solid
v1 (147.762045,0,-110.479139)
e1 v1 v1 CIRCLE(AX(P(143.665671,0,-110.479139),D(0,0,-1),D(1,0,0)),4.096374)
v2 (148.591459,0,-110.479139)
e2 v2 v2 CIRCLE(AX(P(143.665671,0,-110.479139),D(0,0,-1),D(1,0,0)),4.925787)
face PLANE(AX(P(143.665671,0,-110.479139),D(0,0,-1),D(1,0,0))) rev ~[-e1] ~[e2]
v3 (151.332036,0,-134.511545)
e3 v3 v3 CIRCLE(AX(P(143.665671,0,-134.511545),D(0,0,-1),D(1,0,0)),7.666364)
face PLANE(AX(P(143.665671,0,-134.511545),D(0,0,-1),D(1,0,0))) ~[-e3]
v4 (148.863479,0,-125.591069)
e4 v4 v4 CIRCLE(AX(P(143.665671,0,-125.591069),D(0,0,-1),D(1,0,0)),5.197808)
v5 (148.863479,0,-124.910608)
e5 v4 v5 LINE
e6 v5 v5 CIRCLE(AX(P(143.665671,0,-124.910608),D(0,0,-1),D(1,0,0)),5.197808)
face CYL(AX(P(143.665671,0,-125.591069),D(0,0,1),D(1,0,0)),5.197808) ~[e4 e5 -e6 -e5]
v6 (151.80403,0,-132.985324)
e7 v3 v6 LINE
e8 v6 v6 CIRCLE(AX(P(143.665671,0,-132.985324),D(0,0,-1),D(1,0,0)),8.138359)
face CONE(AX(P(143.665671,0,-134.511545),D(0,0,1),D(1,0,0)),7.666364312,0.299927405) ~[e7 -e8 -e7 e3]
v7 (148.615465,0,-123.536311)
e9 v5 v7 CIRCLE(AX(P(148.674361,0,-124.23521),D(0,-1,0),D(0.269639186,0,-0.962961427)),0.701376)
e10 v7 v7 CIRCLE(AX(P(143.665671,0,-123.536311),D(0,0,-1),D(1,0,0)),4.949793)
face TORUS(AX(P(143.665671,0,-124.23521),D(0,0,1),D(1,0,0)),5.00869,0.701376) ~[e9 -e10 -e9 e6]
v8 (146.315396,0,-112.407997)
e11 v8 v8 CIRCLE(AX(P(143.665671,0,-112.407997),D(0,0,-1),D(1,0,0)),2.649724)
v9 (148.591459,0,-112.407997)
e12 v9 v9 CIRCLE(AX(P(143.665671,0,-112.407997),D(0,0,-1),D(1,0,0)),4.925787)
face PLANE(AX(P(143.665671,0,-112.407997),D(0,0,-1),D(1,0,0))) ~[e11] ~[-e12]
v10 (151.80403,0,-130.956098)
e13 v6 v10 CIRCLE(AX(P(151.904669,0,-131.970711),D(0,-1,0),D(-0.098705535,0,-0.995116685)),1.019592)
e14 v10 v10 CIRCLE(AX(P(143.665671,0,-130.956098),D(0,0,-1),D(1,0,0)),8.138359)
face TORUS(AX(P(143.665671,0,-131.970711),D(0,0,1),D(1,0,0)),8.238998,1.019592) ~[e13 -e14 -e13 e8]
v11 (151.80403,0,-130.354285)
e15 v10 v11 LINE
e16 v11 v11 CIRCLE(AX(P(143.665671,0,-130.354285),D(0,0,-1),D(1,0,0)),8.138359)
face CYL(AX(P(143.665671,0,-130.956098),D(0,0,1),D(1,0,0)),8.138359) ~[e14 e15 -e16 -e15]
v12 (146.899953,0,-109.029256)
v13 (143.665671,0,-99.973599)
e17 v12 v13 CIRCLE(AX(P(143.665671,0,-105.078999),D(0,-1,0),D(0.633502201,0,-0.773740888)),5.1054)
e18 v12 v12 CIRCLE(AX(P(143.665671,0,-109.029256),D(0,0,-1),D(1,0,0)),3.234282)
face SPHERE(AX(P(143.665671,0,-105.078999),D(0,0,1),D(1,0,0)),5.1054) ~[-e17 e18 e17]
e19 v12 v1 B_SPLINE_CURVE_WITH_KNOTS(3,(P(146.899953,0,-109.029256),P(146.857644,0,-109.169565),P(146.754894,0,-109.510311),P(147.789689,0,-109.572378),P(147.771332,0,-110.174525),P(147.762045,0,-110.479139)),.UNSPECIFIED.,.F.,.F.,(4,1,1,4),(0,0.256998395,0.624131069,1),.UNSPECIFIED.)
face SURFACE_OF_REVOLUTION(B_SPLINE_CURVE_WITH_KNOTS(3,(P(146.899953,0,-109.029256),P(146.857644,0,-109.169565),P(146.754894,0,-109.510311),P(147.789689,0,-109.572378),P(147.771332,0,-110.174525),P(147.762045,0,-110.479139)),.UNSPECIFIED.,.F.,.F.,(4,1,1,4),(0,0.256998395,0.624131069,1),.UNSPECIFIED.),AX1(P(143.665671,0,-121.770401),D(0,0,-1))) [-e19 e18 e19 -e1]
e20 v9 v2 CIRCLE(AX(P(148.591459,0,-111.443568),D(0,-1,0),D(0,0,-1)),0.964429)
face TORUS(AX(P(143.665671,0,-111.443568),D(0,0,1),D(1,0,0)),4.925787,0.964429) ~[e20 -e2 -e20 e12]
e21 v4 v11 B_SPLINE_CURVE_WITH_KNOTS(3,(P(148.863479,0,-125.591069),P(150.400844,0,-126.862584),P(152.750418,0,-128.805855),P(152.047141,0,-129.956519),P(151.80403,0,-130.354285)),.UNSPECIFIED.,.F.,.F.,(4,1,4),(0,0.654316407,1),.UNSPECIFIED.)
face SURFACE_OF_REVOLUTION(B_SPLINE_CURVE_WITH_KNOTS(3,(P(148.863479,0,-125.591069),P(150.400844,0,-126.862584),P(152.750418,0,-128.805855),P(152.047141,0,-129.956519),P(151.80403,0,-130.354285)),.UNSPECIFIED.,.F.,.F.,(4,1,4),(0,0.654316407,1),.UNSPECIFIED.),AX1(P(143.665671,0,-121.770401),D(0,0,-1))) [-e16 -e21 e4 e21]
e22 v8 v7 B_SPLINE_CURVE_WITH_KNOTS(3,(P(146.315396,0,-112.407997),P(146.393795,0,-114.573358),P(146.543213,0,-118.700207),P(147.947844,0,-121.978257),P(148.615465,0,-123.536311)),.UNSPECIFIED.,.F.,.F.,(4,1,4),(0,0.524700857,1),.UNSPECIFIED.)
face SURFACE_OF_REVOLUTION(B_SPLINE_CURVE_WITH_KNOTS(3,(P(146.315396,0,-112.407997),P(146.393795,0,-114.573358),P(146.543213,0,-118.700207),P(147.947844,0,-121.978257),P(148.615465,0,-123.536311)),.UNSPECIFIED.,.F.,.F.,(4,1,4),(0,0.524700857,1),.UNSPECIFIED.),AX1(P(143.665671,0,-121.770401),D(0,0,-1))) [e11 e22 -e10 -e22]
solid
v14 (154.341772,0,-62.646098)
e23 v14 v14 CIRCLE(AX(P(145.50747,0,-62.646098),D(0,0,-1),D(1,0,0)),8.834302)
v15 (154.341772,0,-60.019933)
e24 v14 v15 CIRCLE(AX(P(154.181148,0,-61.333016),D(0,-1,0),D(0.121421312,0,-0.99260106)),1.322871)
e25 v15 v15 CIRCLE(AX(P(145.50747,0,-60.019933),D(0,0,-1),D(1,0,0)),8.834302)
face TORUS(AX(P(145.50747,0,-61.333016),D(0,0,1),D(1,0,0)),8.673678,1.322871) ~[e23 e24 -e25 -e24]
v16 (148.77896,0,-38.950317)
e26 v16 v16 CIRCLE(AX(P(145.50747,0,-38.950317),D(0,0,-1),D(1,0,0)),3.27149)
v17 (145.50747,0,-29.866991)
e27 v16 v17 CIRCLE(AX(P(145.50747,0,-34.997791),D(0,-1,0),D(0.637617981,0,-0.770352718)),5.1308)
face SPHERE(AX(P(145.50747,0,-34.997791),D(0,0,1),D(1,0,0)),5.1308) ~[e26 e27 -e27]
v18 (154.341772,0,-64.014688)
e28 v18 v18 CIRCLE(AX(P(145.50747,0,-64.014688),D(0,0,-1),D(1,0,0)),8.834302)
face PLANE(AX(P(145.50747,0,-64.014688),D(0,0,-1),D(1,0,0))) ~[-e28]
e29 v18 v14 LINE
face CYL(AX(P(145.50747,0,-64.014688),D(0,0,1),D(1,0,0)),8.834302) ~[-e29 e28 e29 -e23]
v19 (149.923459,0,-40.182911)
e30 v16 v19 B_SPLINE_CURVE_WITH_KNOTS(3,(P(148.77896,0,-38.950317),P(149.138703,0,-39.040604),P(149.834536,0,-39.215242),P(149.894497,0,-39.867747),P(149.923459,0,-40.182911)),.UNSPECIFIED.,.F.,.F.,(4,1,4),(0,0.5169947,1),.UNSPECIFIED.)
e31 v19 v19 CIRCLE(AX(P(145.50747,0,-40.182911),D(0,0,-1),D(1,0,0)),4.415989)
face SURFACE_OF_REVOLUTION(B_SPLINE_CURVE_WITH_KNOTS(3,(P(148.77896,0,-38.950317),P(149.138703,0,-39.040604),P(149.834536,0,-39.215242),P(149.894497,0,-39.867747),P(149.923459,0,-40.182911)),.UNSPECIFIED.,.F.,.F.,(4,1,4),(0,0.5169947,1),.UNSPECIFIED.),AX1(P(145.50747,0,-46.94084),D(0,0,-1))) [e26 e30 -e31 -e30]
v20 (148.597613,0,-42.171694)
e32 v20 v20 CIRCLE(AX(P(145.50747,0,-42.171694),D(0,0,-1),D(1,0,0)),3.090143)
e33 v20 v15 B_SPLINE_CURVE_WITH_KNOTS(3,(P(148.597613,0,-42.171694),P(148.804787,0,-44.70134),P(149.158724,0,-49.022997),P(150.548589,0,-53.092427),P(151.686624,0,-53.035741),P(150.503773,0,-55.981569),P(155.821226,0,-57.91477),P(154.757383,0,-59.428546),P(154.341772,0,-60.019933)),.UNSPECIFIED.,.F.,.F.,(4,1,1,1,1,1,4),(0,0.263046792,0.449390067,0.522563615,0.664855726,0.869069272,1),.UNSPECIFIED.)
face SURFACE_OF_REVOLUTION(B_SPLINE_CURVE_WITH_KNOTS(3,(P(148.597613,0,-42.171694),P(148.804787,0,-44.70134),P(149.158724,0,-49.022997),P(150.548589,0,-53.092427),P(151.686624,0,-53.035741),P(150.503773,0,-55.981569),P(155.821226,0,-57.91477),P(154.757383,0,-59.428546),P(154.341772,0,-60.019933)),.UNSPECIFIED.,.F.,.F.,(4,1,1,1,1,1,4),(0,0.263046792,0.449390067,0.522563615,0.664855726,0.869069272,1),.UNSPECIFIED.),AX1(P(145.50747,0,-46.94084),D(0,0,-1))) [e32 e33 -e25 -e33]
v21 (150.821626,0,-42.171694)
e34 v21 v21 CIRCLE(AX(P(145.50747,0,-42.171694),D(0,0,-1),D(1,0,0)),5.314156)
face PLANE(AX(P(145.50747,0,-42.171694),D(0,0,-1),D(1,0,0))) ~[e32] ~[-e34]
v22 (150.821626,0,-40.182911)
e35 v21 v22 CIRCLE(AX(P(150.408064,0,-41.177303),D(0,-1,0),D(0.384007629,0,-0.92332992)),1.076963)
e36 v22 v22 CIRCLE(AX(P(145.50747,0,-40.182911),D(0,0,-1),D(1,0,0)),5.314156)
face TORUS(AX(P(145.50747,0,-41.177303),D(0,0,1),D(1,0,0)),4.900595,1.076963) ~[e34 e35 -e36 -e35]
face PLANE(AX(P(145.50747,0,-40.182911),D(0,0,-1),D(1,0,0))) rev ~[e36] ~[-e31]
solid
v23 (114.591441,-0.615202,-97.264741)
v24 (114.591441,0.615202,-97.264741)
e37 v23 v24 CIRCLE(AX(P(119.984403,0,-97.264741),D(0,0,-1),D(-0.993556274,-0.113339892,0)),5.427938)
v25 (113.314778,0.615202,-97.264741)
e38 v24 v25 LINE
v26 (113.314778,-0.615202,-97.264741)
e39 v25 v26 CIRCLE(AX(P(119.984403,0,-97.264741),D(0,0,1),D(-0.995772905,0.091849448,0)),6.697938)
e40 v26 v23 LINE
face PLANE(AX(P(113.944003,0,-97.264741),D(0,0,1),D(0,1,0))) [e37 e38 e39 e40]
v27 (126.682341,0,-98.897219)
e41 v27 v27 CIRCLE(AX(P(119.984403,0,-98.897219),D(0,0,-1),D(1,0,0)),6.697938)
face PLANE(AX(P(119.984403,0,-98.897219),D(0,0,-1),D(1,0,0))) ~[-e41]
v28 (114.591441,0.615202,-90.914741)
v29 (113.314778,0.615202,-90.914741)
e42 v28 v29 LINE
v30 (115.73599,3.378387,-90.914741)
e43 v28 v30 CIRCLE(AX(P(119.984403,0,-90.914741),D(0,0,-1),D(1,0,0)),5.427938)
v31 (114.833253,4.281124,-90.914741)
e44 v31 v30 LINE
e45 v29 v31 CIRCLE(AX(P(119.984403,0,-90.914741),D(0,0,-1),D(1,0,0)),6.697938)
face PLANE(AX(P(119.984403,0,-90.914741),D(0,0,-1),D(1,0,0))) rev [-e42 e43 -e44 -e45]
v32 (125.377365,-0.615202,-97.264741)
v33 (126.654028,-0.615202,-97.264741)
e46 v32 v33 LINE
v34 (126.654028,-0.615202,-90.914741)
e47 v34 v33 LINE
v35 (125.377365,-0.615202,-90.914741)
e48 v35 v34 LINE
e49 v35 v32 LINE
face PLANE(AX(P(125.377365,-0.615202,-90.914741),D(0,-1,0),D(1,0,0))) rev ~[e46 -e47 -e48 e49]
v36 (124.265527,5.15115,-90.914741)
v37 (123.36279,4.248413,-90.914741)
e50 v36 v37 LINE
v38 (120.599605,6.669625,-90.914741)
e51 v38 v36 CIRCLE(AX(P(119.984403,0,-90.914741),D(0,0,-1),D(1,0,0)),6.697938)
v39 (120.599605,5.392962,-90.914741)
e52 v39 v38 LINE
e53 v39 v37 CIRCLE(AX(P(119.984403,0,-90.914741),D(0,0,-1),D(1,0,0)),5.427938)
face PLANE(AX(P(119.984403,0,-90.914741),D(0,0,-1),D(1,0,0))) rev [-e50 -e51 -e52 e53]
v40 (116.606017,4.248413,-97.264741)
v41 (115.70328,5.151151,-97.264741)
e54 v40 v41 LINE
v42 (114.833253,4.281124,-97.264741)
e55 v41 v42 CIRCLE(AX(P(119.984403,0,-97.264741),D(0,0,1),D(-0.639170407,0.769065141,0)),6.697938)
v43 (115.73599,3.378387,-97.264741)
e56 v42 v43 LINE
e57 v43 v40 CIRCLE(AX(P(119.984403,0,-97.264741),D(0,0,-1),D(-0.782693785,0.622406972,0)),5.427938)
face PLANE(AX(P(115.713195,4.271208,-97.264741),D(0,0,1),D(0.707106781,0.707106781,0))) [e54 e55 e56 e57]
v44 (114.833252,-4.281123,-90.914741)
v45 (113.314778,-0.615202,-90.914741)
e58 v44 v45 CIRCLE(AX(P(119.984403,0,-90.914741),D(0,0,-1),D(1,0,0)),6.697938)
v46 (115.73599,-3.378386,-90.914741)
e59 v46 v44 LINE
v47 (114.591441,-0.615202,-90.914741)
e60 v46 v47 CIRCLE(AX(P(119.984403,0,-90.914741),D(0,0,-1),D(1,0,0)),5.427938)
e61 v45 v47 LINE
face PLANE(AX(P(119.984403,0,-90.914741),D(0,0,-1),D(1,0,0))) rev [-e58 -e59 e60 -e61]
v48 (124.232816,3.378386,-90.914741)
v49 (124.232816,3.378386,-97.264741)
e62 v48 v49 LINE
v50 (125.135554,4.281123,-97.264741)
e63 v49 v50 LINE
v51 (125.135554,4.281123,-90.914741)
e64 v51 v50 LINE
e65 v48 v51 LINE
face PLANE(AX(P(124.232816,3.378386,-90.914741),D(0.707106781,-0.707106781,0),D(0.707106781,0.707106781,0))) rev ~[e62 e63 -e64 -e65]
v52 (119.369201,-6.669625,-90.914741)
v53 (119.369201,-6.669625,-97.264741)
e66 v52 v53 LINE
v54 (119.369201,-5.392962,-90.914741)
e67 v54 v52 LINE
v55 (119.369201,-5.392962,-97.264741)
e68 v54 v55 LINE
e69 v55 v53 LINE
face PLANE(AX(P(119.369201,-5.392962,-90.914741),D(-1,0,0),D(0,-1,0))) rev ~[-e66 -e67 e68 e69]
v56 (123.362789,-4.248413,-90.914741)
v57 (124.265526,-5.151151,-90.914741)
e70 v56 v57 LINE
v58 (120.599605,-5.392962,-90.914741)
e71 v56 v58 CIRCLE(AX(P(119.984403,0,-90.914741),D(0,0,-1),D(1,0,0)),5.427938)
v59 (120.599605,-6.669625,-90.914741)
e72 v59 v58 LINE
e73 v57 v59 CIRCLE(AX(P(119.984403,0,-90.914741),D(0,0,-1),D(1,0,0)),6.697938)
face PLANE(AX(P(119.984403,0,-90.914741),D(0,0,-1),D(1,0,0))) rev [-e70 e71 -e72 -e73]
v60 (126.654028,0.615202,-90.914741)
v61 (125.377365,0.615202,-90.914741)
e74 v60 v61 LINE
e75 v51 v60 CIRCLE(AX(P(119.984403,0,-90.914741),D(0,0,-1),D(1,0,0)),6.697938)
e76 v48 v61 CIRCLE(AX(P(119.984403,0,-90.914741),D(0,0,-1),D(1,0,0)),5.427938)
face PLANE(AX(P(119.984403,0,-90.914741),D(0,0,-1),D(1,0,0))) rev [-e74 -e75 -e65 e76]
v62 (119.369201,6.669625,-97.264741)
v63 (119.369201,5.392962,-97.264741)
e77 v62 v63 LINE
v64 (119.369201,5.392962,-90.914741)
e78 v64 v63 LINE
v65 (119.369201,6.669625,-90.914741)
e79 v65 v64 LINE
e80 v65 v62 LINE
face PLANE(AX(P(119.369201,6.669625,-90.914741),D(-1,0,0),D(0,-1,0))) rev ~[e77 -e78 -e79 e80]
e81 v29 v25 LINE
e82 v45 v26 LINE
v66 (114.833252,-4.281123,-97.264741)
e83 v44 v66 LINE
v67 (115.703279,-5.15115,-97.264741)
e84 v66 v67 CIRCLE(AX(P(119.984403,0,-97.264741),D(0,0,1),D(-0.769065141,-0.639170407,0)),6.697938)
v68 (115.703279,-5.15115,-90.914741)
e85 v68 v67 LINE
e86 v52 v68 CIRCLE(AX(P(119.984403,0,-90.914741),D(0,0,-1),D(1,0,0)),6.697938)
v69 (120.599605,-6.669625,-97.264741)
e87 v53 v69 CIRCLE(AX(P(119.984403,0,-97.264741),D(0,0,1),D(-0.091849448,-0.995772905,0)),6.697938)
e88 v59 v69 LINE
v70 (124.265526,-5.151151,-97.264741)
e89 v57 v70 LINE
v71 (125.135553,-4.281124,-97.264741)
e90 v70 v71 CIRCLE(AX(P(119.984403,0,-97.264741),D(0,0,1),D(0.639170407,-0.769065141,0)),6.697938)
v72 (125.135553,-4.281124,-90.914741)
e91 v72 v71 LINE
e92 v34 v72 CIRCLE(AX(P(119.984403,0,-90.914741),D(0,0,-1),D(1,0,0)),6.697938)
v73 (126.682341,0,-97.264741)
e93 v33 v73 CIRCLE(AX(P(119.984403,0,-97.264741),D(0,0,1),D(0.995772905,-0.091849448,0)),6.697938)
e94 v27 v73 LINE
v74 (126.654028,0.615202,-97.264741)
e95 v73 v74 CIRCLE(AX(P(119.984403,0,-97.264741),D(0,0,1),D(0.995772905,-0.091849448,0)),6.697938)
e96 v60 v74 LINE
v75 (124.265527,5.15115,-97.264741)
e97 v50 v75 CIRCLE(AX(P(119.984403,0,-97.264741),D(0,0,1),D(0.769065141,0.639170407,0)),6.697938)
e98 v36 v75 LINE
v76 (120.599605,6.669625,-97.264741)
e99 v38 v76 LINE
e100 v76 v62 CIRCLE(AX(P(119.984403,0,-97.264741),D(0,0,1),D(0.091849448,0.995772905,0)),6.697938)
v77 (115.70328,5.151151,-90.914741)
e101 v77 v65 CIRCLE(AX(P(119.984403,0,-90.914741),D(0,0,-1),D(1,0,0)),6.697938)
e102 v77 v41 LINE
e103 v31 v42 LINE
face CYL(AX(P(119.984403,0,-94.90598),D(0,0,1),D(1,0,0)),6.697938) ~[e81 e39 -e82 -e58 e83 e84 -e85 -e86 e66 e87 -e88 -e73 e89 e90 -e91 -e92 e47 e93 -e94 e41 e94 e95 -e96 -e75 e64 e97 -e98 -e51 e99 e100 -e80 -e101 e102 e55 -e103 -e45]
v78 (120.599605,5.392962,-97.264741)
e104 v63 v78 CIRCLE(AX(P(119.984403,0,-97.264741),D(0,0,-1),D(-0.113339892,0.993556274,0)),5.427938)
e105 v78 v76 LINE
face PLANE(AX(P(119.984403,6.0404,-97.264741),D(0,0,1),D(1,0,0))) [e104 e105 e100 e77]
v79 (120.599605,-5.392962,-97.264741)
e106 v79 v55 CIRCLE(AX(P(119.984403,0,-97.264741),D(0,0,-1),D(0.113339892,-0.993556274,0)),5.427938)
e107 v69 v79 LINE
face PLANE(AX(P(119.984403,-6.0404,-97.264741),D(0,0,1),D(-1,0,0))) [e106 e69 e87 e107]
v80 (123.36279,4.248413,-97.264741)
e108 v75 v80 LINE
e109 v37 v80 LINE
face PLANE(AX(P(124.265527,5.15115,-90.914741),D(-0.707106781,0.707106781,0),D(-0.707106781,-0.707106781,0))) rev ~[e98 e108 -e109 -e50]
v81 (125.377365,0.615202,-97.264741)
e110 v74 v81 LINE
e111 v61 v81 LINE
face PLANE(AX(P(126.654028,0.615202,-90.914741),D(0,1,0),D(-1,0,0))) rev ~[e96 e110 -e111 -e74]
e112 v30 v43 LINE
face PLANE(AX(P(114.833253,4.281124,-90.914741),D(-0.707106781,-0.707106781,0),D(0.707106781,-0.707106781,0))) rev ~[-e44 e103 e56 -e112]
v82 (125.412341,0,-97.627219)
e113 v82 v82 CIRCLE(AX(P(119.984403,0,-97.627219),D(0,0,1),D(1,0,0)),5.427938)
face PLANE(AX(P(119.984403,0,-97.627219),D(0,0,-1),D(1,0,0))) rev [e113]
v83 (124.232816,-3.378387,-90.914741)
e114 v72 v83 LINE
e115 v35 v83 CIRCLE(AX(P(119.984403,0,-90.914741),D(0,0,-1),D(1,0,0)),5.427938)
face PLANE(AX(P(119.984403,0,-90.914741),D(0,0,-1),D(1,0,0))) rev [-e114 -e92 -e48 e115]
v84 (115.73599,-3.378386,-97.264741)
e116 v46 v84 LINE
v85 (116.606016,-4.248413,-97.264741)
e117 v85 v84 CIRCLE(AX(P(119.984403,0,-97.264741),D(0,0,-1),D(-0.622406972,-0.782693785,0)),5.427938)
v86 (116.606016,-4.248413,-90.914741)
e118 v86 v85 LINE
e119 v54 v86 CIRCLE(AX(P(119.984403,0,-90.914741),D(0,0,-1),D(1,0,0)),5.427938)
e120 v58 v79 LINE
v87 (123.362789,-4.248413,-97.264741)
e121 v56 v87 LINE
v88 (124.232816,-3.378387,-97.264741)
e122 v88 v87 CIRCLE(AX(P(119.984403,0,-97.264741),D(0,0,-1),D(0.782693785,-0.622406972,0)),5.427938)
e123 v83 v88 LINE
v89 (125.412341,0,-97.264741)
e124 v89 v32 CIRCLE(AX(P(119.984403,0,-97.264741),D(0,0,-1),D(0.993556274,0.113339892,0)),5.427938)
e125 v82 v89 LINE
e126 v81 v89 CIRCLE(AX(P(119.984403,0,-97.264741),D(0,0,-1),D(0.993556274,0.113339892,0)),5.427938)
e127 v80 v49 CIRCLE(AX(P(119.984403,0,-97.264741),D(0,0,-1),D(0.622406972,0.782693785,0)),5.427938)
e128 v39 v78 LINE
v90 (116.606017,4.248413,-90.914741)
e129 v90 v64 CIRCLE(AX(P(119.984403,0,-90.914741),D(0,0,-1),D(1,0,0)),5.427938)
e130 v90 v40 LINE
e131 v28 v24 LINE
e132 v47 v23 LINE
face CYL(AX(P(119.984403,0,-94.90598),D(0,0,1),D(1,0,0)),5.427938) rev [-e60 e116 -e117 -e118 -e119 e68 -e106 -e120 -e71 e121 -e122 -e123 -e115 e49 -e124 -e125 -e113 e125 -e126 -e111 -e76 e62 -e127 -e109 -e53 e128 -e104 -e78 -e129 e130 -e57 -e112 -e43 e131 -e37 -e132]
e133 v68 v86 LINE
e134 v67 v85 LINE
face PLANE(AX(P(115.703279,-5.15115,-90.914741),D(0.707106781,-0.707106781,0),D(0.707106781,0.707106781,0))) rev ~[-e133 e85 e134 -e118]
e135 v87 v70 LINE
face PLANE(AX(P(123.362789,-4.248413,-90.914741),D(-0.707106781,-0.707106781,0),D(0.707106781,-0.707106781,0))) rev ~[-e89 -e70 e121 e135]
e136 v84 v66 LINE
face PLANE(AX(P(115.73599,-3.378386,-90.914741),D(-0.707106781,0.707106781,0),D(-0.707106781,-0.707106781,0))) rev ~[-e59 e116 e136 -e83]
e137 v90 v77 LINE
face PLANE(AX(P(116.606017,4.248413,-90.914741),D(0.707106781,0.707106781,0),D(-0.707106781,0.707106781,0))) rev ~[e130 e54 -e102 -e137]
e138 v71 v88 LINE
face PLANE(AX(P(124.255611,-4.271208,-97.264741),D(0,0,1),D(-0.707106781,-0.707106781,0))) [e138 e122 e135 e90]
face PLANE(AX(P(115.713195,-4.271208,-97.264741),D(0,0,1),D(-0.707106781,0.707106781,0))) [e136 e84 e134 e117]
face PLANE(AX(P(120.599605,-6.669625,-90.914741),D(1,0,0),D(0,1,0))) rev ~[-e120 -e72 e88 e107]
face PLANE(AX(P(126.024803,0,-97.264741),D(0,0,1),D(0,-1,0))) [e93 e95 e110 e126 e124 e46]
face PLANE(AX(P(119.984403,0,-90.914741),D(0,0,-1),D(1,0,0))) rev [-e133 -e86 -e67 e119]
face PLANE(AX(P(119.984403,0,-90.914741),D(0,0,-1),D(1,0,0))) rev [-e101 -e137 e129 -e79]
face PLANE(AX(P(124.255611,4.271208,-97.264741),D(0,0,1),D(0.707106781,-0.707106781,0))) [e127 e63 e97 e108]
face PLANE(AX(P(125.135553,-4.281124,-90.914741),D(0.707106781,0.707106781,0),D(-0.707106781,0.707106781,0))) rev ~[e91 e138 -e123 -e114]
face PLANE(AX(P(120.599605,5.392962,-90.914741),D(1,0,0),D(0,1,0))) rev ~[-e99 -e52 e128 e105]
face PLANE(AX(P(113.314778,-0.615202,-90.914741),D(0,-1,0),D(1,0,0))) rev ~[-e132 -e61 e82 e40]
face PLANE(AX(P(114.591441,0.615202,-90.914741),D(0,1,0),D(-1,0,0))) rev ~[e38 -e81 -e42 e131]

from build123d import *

# Parameters (mm, degrees)
F0_W            = 6.6979378462
F0_H            = 7.9824775457
F4_T            = -1.27
F6_DEPTH        = 6.35
F6_COPIES_COUNT = 8


# Not quite as in the source:
# - a pattern or mirror of a feature is missing from the dataset's text; its kind, count and spacing are read off the source's solid


with BuildPart() as f1:
    # F0 (on Front) → F1 (revolve)
    with BuildSketch(Plane.XZ):
        with BuildLine():
            add(Edge.make_bspline(
                [(148.7789601088, -38.950316608), (149.1387025112, -39.0406037985), (149.8345363416, -39.2152423209), (149.894497256, -39.8677474324), (149.9234586954, -40.1829108596)],
                knots=[0, 0, 0, 0, 0.5169947, 1, 1, 1, 1], degree=3))
            ThreePointArc((148.7789601088, -38.950316608), (150.3347219752, -33.2591866073), (145.5074697733, -29.8669908807))
            Line((145.5074697733, -29.8669908807), (145.5074697733, -64.0146881342))
            Line((145.5074697733, -64.0146881342), (154.3417721987, -64.0146881342))
            Line((154.3417721987, -64.0146881342), (154.3417721987, -62.6460984349))
            ThreePointArc((154.3417721987, -62.6460984349), (155.504018215, -61.3330155611), (154.3417721987, -60.0199326873))
            add(Edge.make_bspline(
                [(148.597612977, -42.1716943383), (148.8047871619, -44.7013404483), (149.1587242701, -49.0229967844), (150.5485886489, -53.092426934), (151.6866239156, -53.0357410053), (150.5037728043, -55.9815689857), (155.8212260112, -57.9147702783), (154.7573833416, -59.428546226), (154.3417721987, -60.0199326873)],
                knots=[0, 0, 0, 0, 0.263046792, 0.4493900673, 0.5225636147, 0.6648557255, 0.8690692722, 1, 1, 1, 1], degree=3))
            Line((148.597612977, -42.1716943383), (150.8216261864, -42.1716943383))
            ThreePointArc((150.8216261864, -42.1716943383), (151.4850268973, -41.177302599), (150.8216261864, -40.1829108596))
            Line((150.8216261864, -40.1829108596), (149.9234586954, -40.1829108596))
        make_face()
    revolve(axis=Axis((145.5074697733, 0, -46.9408395074), (0, 0, -1)))


with BuildPart() as f2:
    # F0 (on Front) → F2 (revolve)
    with BuildSketch(Plane.XZ):
        with BuildLine():
            add(Edge.make_bspline(
                [(146.8999534845, -109.0292558074), (146.8576441295, -109.1695647974), (146.7548941379, -109.5103108935), (147.7896890033, -109.5723780868), (147.7713317923, -110.1745251961), (147.7620452642, -110.4791387916)],
                knots=[0, 0, 0, 0, 0.2569983953, 0.624131069, 1, 1, 1, 1], degree=3))
            ThreePointArc((146.8999534845, -109.0292558074), (148.4736204885, -103.3618111947), (143.6656713486, -99.9735990784))
            Line((143.6656713486, -99.9735990784), (143.6656713486, -109.0292558074))
            Line((143.6656713486, -109.0292558074), (143.6656713486, -134.5115453005))
            Line((143.6656713486, -134.5115453005), (151.3320356607, -134.5115453005))
            Line((151.3320356607, -134.5115453005), (151.8040299416, -132.9853236675))
            ThreePointArc((151.8040299416, -132.9853236675), (152.9242608777, -131.9707110524), (151.8040299416, -130.9560984373))
            Line((151.8040299416, -130.9560984373), (151.8040299416, -130.3542852402))
            add(Edge.make_bspline(
                [(148.863479495, -125.5910694599), (150.4008443737, -126.8625837497), (152.7504184668, -128.8058550418), (152.0471413144, -129.9565194376), (151.8040299416, -130.3542852402)],
                knots=[0, 0, 0, 0, 0.6543164071, 1, 1, 1, 1], degree=3))
            Line((148.863479495, -125.5910694599), (148.863479495, -124.910607934))
            ThreePointArc((148.863479495, -124.910607934), (149.3645873733, -124.1106469588), (148.6154645681, -123.53631109))
            add(Edge.make_bspline(
                [(146.3153958321, -112.4079972506), (146.3937953533, -114.5733581792), (146.5432129123, -118.7002066468), (147.9478444177, -121.9782567066), (148.6154645681, -123.53631109)],
                knots=[0, 0, 0, 0, 0.5247008572, 1, 1, 1, 1], degree=3))
            Line((146.3153958321, -112.4079972506), (148.5914587975, -112.4079972506))
            ThreePointArc((148.5914587975, -112.4079972506), (149.555888027, -111.4435680211), (148.5914587975, -110.4791387916))
            Line((148.5914587975, -110.4791387916), (147.7620452642, -110.4791387916))
        make_face()
    revolve(axis=Axis((143.6656713486, 0, -121.7704005539), (0, 0, -1)))


with BuildPart() as f3:
    # F0 (on Front) → F3 (revolve)
    with BuildSketch(Plane.XZ):
        with Locations((123.3333721757, -94.9059799314)):
            Rectangle(F0_W, F0_H)
    revolve(axis=Axis((119.9844032526, 0, -94.9059799314), (0, 0, -1)))

    # F4
    f4_openings = [f3.faces().sort_by_distance(p)[0] for p in [
        (119.984403, 0, -90.914741),
    ]]
    offset(amount=F4_T, openings=f4_openings)

    # F5 (on face) → F6 (cut)
    with BuildSketch(Plane.XY.offset(-90.9147411585)):
        with BuildLine():
            Line((120.5996051431, 5.3929616998), (120.5996051431, 6.6696250288))
            ThreePointArc((120.5996051431, 6.6696250288), (119.9844032526, 6.6979378462), (119.3692013621, 6.6696250288))
            Line((119.3692013621, 6.6696250288), (119.3692013621, 5.3929616998))
            ThreePointArc((119.3692013621, 5.3929616998), (119.9844032526, 5.4279378462), (120.5996051431, 5.3929616998))
        make_face()
    f6 = extrude(amount=-F6_DEPTH, mode=Mode.SUBTRACT)

    # F6_copies: F6 ×8 about axis
    f6_copies_axis = Axis((119.984403, 0, 0), (0, 0, 1))
    for i in range(1, F6_COPIES_COUNT):
        add(f6.rotate(f6_copies_axis, i * 360 / F6_COPIES_COUNT), mode=Mode.SUBTRACT)


solid = Compound([f1.part, f2.part, f3.part])
